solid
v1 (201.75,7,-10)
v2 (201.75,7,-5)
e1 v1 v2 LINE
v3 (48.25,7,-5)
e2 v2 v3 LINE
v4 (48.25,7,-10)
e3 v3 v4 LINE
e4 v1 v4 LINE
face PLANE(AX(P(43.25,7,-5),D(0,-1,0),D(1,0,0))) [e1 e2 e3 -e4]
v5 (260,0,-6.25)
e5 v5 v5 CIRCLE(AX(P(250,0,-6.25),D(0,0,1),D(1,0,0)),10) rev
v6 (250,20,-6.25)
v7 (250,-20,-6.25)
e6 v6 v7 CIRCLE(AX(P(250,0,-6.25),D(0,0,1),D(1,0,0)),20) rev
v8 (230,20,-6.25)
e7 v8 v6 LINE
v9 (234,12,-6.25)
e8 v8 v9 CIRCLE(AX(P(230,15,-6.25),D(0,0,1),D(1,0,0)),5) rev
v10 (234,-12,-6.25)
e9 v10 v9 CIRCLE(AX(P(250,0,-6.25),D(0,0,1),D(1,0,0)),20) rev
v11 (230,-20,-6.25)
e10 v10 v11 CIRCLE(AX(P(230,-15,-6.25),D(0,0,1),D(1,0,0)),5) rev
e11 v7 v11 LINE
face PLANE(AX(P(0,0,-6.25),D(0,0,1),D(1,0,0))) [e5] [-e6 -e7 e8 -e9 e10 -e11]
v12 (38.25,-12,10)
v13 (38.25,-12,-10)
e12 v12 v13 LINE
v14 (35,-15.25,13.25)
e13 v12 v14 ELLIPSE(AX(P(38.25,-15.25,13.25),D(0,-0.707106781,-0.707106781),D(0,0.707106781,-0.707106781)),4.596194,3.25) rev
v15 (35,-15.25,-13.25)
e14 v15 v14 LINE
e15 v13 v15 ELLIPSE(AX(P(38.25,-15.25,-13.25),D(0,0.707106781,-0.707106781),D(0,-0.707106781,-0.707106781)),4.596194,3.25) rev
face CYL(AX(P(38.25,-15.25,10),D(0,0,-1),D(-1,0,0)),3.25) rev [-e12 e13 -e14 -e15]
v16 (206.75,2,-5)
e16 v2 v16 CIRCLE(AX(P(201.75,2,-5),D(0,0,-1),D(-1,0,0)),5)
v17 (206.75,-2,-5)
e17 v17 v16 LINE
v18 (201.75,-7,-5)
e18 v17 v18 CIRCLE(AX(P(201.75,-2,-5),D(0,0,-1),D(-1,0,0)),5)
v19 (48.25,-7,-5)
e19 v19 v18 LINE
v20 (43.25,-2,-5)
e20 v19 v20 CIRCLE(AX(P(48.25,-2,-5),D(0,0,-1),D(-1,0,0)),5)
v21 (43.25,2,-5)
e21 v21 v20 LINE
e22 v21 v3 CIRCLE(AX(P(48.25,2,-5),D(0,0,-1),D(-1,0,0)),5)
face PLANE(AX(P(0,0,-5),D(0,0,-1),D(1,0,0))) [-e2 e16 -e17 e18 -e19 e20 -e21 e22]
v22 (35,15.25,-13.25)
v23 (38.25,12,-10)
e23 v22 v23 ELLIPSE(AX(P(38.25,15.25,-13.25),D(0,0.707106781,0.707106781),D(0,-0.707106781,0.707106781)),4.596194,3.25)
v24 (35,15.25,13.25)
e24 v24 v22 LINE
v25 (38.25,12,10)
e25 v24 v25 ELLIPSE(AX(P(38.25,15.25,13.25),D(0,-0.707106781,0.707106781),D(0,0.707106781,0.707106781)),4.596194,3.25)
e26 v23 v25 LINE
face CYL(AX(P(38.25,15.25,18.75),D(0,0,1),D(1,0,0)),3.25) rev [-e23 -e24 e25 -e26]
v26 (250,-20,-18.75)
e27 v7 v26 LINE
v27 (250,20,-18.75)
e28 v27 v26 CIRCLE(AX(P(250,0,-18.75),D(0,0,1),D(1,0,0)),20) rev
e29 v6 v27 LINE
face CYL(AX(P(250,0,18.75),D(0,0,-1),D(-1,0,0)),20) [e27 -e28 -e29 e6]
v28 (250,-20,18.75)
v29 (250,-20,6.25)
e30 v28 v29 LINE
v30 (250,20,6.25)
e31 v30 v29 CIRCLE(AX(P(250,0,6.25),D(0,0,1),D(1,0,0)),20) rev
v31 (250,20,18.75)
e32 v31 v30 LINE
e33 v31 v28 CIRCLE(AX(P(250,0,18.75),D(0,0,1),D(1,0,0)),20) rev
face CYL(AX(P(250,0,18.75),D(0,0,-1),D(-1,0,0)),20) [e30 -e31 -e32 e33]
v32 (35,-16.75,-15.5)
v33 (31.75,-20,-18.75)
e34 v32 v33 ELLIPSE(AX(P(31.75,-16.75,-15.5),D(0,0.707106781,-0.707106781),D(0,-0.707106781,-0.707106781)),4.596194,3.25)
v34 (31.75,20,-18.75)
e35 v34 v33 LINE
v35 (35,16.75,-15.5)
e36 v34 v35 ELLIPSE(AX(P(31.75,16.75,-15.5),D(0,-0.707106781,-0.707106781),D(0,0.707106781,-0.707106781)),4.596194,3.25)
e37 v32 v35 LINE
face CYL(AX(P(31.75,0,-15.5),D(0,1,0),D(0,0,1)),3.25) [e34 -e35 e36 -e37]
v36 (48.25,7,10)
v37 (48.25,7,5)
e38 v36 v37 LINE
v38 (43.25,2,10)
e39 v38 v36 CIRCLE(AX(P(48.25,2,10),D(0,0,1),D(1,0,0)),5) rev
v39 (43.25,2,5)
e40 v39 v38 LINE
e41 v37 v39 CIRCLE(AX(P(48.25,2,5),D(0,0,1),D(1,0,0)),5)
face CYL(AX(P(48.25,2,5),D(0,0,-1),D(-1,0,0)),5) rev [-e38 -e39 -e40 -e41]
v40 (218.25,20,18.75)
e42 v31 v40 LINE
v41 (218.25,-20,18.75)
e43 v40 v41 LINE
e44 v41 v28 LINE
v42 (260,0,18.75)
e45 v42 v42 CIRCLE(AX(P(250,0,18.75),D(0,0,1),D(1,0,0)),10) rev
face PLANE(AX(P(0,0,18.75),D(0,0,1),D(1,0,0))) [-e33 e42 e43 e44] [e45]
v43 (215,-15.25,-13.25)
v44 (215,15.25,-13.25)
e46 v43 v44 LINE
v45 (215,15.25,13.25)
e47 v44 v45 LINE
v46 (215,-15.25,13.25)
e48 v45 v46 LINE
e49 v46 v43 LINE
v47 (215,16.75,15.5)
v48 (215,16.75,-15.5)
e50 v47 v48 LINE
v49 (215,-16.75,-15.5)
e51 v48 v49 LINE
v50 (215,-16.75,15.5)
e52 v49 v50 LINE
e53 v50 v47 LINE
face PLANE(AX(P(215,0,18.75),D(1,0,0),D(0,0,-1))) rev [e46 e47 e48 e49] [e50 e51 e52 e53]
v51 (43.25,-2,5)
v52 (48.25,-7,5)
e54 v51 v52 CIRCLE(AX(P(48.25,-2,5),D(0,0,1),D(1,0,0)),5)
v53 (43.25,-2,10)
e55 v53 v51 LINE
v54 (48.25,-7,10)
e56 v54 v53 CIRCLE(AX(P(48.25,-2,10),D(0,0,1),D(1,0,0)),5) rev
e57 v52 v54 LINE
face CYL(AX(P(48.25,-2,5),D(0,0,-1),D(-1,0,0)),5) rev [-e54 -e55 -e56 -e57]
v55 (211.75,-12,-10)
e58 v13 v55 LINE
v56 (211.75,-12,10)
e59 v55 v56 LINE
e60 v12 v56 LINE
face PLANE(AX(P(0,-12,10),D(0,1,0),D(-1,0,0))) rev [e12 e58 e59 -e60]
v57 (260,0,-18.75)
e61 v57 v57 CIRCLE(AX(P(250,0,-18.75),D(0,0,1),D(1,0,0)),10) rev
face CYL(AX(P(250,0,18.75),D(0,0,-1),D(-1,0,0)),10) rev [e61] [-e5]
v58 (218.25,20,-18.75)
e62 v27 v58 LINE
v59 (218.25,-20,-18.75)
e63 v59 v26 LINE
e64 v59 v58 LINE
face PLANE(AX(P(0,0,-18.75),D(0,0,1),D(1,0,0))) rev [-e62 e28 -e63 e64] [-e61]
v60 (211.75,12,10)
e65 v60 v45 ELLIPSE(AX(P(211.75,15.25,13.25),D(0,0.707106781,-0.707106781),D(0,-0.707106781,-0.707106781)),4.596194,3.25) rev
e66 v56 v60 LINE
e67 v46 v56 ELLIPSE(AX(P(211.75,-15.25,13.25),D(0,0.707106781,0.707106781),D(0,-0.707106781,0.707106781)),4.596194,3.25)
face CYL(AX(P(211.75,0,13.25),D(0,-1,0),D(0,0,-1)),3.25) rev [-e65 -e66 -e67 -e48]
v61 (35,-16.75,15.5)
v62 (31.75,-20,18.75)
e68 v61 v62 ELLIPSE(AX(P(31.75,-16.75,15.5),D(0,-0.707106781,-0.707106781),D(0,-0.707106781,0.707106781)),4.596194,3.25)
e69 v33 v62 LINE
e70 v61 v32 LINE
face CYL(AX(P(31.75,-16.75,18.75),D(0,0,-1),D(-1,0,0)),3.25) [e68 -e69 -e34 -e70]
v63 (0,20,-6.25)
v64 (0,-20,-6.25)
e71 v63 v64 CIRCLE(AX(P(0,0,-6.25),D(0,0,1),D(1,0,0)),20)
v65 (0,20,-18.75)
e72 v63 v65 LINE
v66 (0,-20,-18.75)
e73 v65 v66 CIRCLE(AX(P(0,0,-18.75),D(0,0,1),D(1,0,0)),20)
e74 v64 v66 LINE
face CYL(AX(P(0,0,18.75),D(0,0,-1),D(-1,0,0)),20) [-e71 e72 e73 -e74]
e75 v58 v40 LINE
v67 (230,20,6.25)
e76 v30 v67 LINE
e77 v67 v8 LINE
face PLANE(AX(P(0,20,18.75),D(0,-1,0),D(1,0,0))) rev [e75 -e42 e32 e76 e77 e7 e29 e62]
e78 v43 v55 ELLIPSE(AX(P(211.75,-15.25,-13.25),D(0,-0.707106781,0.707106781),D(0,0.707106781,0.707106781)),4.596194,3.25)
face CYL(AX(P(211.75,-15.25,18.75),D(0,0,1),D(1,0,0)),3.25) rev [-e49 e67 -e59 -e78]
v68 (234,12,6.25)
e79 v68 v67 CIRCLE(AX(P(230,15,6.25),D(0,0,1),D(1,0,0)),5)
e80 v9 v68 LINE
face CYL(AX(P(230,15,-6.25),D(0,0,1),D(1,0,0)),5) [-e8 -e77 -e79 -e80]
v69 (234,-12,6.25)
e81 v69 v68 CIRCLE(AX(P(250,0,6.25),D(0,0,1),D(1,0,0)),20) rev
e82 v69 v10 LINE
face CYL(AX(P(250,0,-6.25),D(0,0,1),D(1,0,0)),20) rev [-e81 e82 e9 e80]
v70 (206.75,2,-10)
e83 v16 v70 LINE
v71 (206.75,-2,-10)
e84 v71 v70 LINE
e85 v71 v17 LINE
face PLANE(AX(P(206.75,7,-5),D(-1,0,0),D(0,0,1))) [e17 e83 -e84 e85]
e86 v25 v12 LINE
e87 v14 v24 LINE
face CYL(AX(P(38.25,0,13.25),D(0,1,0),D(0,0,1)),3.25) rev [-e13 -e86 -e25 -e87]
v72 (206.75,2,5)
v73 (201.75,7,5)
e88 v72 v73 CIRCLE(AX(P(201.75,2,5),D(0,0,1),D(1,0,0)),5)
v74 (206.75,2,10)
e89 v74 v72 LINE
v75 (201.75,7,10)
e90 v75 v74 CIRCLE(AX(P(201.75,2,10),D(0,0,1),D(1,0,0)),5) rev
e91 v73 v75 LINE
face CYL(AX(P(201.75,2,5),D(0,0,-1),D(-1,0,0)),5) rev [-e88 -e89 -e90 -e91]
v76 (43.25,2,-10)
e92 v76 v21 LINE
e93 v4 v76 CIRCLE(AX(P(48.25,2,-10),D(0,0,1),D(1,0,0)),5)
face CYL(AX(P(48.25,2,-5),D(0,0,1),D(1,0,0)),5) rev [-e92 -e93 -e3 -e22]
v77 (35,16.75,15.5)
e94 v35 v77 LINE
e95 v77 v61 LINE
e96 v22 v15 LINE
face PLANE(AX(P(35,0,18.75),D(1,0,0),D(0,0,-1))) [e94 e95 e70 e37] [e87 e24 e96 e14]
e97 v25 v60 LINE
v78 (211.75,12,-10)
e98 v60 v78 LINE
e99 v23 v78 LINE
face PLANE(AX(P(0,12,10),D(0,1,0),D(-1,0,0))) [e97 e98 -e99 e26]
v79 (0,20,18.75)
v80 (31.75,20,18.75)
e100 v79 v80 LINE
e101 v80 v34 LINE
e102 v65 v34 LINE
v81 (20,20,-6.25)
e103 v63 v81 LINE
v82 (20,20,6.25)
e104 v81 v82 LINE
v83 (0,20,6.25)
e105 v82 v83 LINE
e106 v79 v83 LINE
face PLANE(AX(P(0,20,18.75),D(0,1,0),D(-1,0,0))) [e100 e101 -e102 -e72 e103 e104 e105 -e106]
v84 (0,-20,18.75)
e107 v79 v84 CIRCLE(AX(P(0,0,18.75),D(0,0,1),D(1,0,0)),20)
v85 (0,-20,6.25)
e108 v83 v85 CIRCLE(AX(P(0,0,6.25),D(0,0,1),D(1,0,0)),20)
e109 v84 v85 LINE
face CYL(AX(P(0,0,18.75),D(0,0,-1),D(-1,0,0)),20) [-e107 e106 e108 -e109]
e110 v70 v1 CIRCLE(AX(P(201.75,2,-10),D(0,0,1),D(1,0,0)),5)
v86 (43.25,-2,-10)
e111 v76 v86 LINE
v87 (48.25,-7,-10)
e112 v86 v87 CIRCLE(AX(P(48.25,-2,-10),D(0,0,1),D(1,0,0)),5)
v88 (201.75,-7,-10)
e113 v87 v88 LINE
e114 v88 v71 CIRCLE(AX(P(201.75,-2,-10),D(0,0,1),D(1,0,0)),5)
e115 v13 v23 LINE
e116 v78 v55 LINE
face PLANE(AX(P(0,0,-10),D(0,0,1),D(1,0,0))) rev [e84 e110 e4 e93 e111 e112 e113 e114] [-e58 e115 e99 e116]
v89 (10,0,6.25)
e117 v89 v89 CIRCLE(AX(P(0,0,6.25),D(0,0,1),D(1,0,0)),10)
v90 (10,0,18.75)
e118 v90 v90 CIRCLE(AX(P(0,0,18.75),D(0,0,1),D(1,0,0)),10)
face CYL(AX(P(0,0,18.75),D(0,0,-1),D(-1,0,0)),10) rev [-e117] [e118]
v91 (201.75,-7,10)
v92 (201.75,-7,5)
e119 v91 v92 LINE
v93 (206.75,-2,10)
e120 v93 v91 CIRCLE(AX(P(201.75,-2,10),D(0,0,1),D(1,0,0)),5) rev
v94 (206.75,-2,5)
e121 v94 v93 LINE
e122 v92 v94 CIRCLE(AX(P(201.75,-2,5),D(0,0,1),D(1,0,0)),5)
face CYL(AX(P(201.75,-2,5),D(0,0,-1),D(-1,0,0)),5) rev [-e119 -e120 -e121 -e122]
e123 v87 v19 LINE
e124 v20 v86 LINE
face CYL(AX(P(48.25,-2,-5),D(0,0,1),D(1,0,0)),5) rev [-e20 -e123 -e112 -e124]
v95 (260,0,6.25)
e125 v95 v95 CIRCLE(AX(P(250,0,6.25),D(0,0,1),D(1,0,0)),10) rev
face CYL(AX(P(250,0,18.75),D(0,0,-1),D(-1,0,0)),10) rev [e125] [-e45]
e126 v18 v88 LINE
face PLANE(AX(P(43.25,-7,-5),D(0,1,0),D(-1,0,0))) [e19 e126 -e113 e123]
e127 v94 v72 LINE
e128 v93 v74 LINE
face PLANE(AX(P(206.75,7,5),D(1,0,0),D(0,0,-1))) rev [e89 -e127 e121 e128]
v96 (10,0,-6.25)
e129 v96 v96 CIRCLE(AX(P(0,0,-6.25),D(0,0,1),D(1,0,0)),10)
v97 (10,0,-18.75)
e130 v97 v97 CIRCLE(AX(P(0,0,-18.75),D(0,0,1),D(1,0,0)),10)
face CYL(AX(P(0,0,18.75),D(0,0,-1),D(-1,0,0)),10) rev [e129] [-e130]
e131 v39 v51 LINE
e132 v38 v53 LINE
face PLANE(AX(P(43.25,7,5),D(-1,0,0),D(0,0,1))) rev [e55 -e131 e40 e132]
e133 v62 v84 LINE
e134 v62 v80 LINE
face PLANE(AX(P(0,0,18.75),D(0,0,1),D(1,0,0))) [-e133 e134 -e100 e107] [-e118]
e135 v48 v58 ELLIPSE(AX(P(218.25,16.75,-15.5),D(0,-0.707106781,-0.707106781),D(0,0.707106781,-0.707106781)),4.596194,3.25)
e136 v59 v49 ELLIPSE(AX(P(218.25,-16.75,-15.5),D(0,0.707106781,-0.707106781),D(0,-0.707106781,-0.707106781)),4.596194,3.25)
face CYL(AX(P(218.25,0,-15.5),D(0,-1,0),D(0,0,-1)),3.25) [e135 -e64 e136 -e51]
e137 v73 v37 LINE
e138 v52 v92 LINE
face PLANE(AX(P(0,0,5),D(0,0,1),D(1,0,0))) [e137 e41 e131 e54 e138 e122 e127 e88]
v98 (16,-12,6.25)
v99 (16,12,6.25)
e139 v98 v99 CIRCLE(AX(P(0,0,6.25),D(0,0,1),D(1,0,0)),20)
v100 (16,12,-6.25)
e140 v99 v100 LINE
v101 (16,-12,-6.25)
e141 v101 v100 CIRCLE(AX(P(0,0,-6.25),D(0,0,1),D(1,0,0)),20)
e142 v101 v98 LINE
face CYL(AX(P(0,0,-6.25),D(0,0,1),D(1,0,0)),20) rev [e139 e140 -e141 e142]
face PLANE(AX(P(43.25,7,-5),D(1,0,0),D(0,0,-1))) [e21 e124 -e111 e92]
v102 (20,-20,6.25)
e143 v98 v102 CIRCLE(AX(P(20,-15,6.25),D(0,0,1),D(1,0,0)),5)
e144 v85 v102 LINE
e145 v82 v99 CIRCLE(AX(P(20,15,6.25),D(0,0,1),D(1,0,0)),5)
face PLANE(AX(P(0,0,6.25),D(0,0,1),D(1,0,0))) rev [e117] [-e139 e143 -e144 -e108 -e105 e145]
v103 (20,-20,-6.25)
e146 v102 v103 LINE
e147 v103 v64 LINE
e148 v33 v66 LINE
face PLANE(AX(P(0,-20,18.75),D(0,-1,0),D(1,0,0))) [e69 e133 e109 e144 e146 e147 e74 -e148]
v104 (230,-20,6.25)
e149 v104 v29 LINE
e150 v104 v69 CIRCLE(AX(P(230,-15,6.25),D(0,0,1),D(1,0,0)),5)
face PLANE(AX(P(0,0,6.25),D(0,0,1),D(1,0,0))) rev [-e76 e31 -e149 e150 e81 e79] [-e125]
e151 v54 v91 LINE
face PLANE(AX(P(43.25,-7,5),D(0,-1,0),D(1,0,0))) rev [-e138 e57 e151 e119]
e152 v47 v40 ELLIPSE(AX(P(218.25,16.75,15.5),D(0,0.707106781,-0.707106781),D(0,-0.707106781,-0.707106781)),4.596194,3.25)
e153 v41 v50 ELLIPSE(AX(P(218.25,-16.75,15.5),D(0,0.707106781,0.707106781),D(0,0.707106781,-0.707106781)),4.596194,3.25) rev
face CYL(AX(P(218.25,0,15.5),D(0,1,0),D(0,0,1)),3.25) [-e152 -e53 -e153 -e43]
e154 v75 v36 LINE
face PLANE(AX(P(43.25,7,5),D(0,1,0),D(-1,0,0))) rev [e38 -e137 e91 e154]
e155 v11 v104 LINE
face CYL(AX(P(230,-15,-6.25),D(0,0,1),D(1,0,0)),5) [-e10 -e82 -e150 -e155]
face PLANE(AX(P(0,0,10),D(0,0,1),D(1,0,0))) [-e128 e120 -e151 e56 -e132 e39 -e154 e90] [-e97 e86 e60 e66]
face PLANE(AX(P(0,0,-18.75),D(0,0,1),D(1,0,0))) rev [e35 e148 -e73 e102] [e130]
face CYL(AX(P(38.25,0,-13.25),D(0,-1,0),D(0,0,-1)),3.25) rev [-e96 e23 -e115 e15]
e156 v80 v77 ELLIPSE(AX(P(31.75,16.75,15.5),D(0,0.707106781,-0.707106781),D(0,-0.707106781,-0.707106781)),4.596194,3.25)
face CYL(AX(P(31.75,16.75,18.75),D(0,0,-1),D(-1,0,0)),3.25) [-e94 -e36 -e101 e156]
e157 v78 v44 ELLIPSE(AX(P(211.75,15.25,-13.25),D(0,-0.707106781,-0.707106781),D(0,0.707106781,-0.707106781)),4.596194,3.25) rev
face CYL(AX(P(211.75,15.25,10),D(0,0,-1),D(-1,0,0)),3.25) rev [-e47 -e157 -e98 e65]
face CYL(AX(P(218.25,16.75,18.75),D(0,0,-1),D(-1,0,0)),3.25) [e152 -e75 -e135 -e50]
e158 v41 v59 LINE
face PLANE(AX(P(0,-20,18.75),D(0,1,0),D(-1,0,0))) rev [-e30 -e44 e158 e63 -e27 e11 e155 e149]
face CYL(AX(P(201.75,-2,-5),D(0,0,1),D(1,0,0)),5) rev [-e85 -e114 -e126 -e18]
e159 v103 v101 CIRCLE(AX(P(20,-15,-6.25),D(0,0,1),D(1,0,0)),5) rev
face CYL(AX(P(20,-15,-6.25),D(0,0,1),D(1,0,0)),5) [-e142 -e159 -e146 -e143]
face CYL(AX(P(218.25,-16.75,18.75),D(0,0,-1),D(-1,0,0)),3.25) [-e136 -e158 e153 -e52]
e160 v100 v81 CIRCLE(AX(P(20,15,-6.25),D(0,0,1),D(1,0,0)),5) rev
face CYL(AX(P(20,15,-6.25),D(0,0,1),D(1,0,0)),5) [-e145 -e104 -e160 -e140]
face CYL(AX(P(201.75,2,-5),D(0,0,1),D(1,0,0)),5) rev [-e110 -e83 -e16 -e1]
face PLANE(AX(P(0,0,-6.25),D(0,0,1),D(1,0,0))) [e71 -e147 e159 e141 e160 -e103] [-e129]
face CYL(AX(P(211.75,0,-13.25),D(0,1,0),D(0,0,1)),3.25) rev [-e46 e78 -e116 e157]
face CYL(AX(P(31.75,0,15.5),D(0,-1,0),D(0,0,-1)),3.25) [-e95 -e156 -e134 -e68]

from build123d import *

# Parameters (mm, degrees)
SKETCH1_W            = 180
SKETCH1_H            = 24
BOSS_EXTRUDE3_DEPTH  = 10
SKETCH1_6_R          = 20
SKETCH1_6_R_2        = 10
HEAD_WIDTH_DEPTH     = 18.75
SKETCH1_7_R          = 20
SKETCH1_7_R_2        = 10
CUT_EXTRUDE1_DEPTH   = 6.25
FILLET1_START        = -6.25
FILLET1_DEPTH        = 12.5
FILLET2_R            = 3.25
SKETCH2_W            = 163.5
SKETCH2_H            = 14
CUT_EXTRUDE2_DEPTH   = 5
FILLET3_R            = 5
FILLET3_OF_MIRROR1_R = 5


with BuildPart() as part:
    # Sketch1 → Boss-Extrude3 (new, symmetric)
    with BuildSketch(Plane.XY):
        with Locations((125, 0)):
            Rectangle(SKETCH1_W, SKETCH1_H)
    extrude(amount=BOSS_EXTRUDE3_DEPTH, both=True)

    # Sketch1<6> → Head Width (add, symmetric)
    # profile 1 of 4: a face of its own
    with BuildSketch(Plane.XY):
        with BuildLine():
            Line((35, -12), (35, 12))
            Line((35, 12), (35, 20))
            Line((35, 20), (0, 20))
            ThreePointArc((0, 20), (14.142135624, 14.142135624), (20, 0))
            ThreePointArc((20, 0), (14.142135624, -14.142135624), (0, -20))
            Line((0, -20), (35, -20))
            Line((35, -20), (35, -12))
        make_face()
    # profile 2 of 4: a face of its own
    with BuildSketch(Plane.XY):
        Circle(SKETCH1_6_R)
        Circle(SKETCH1_6_R_2, mode=Mode.SUBTRACT)
    # profile 3 of 4: a face of its own
    with BuildSketch(Plane.XY):
        with BuildLine():
            Line((215, 20), (215, 12))
            Line((215, 12), (215, -12))
            Line((215, -12), (215, -20))
            Line((215, -20), (250, -20))
            ThreePointArc((250, -20), (230, 0), (250, 20))
            Line((250, 20), (215, 20))
        make_face()
    # profile 4 of 4: a face of its own
    with BuildSketch(Plane.XY):
        with Locations((250, 0)):
            Circle(SKETCH1_6_R)
        with Locations((250, 0)):
            Circle(SKETCH1_6_R_2, mode=Mode.SUBTRACT)
    extrude(amount=HEAD_WIDTH_DEPTH, both=True)

    # Sketch1<7> → Cut-Extrude1 (cut, symmetric)
    # profile 1 of 2: a face of its own
    with BuildSketch(Plane.XY):
        Circle(SKETCH1_7_R)
        Circle(SKETCH1_7_R_2, mode=Mode.SUBTRACT)
    # profile 2 of 2: a face of its own
    with BuildSketch(Plane.XY):
        with Locations((250, 0)):
            Circle(SKETCH1_7_R)
        with Locations((250, 0)):
            Circle(SKETCH1_7_R_2, mode=Mode.SUBTRACT)
    extrude(amount=CUT_EXTRUDE1_DEPTH, both=True, mode=Mode.SUBTRACT)

    # Fillet1: read off the stored shape, not the designer's step
    # Fillet1 outline → Fillet1 (cut)
    with BuildSketch(Plane.XY.offset(FILLET1_START)):
        with BuildLine():
            ThreePointArc((230, 20), (234.472135955, 17.236067977), (234, 12))
            ThreePointArc((234, 12), (241.05572809, 17.88854382), (250, 20))
            Line((250, 20), (230, 20))
        make_face()
        with BuildLine():
            ThreePointArc((234, -12), (234.472135955, -17.236067977), (230, -20))
            Line((230, -20), (250, -20))
            ThreePointArc((250, -20), (241.05572809, -17.88854382), (234, -12))
        make_face()
        with BuildLine():
            ThreePointArc((20, -20), (15.527864045, -17.236067977), (16, -12))
            ThreePointArc((16, -12), (8.94427191, -17.88854382), (0, -20))
            Line((0, -20), (20, -20))
        make_face()
        with BuildLine():
            ThreePointArc((0, 20), (8.94427191, 17.88854382), (16, 12))
            ThreePointArc((16, 12), (15.527864045, 17.236067977), (20, 20))
            Line((20, 20), (0, 20))
        make_face()
    extrude(amount=FILLET1_DEPTH, mode=Mode.SUBTRACT)

    # Fillet2
    fillet2_edges = [part.edges().sort_by_distance(p)[0] for p in [
        (35, 0, 10),
        (35, 20, 0),
        (35, 0, 18.75),
        (35, -20, 0),
        (35, 0, -18.75),
        (215, -20, 0),
        (215, 0, -18.75),
        (215, 20, 0),
        (215, 0, 18.75),
        (215, 0, 10),
        (35, 0, -10),
        (215, 0, -10),
        (215, -12, 0),
        (35, -12, 0),
        (35, 12, 0),
        (215, 12, 0),
    ]]
    fillet(fillet2_edges, radius=FILLET2_R)

    # Sketch2 → Cut-Extrude2 (cut)
    with BuildSketch(Plane.XY.offset(10)):
        with Locations((125, 0)):
            Rectangle(SKETCH2_W, SKETCH2_H)
    cut_extrude2 = extrude(amount=-CUT_EXTRUDE2_DEPTH, mode=Mode.SUBTRACT)

    # Fillet3
    fillet3_edges = [part.edges().sort_by_distance(p)[0] for p in [
        (43.25, -7, 7.5),
        (43.25, 7, 7.5),
        (206.75, 7, 7.5),
        (206.75, -7, 7.5),
    ]]
    fillet(fillet3_edges, radius=FILLET3_R)

    # Mirror1: Cut-Extrude2 across plane
    add(cut_extrude2.mirror(Plane.XY), mode=Mode.SUBTRACT)

    # Fillet3 of Mirror1
    fillet3_of_mirror1_edges = [part.edges().sort_by_distance(p)[0] for p in [
        (43.25, -7, -7.5),
        (43.25, 7, -7.5),
        (206.75, 7, -7.5),
        (206.75, -7, -7.5),
    ]]
    fillet(fillet3_of_mirror1_edges, radius=FILLET3_OF_MIRROR1_R)


solid = part.part
